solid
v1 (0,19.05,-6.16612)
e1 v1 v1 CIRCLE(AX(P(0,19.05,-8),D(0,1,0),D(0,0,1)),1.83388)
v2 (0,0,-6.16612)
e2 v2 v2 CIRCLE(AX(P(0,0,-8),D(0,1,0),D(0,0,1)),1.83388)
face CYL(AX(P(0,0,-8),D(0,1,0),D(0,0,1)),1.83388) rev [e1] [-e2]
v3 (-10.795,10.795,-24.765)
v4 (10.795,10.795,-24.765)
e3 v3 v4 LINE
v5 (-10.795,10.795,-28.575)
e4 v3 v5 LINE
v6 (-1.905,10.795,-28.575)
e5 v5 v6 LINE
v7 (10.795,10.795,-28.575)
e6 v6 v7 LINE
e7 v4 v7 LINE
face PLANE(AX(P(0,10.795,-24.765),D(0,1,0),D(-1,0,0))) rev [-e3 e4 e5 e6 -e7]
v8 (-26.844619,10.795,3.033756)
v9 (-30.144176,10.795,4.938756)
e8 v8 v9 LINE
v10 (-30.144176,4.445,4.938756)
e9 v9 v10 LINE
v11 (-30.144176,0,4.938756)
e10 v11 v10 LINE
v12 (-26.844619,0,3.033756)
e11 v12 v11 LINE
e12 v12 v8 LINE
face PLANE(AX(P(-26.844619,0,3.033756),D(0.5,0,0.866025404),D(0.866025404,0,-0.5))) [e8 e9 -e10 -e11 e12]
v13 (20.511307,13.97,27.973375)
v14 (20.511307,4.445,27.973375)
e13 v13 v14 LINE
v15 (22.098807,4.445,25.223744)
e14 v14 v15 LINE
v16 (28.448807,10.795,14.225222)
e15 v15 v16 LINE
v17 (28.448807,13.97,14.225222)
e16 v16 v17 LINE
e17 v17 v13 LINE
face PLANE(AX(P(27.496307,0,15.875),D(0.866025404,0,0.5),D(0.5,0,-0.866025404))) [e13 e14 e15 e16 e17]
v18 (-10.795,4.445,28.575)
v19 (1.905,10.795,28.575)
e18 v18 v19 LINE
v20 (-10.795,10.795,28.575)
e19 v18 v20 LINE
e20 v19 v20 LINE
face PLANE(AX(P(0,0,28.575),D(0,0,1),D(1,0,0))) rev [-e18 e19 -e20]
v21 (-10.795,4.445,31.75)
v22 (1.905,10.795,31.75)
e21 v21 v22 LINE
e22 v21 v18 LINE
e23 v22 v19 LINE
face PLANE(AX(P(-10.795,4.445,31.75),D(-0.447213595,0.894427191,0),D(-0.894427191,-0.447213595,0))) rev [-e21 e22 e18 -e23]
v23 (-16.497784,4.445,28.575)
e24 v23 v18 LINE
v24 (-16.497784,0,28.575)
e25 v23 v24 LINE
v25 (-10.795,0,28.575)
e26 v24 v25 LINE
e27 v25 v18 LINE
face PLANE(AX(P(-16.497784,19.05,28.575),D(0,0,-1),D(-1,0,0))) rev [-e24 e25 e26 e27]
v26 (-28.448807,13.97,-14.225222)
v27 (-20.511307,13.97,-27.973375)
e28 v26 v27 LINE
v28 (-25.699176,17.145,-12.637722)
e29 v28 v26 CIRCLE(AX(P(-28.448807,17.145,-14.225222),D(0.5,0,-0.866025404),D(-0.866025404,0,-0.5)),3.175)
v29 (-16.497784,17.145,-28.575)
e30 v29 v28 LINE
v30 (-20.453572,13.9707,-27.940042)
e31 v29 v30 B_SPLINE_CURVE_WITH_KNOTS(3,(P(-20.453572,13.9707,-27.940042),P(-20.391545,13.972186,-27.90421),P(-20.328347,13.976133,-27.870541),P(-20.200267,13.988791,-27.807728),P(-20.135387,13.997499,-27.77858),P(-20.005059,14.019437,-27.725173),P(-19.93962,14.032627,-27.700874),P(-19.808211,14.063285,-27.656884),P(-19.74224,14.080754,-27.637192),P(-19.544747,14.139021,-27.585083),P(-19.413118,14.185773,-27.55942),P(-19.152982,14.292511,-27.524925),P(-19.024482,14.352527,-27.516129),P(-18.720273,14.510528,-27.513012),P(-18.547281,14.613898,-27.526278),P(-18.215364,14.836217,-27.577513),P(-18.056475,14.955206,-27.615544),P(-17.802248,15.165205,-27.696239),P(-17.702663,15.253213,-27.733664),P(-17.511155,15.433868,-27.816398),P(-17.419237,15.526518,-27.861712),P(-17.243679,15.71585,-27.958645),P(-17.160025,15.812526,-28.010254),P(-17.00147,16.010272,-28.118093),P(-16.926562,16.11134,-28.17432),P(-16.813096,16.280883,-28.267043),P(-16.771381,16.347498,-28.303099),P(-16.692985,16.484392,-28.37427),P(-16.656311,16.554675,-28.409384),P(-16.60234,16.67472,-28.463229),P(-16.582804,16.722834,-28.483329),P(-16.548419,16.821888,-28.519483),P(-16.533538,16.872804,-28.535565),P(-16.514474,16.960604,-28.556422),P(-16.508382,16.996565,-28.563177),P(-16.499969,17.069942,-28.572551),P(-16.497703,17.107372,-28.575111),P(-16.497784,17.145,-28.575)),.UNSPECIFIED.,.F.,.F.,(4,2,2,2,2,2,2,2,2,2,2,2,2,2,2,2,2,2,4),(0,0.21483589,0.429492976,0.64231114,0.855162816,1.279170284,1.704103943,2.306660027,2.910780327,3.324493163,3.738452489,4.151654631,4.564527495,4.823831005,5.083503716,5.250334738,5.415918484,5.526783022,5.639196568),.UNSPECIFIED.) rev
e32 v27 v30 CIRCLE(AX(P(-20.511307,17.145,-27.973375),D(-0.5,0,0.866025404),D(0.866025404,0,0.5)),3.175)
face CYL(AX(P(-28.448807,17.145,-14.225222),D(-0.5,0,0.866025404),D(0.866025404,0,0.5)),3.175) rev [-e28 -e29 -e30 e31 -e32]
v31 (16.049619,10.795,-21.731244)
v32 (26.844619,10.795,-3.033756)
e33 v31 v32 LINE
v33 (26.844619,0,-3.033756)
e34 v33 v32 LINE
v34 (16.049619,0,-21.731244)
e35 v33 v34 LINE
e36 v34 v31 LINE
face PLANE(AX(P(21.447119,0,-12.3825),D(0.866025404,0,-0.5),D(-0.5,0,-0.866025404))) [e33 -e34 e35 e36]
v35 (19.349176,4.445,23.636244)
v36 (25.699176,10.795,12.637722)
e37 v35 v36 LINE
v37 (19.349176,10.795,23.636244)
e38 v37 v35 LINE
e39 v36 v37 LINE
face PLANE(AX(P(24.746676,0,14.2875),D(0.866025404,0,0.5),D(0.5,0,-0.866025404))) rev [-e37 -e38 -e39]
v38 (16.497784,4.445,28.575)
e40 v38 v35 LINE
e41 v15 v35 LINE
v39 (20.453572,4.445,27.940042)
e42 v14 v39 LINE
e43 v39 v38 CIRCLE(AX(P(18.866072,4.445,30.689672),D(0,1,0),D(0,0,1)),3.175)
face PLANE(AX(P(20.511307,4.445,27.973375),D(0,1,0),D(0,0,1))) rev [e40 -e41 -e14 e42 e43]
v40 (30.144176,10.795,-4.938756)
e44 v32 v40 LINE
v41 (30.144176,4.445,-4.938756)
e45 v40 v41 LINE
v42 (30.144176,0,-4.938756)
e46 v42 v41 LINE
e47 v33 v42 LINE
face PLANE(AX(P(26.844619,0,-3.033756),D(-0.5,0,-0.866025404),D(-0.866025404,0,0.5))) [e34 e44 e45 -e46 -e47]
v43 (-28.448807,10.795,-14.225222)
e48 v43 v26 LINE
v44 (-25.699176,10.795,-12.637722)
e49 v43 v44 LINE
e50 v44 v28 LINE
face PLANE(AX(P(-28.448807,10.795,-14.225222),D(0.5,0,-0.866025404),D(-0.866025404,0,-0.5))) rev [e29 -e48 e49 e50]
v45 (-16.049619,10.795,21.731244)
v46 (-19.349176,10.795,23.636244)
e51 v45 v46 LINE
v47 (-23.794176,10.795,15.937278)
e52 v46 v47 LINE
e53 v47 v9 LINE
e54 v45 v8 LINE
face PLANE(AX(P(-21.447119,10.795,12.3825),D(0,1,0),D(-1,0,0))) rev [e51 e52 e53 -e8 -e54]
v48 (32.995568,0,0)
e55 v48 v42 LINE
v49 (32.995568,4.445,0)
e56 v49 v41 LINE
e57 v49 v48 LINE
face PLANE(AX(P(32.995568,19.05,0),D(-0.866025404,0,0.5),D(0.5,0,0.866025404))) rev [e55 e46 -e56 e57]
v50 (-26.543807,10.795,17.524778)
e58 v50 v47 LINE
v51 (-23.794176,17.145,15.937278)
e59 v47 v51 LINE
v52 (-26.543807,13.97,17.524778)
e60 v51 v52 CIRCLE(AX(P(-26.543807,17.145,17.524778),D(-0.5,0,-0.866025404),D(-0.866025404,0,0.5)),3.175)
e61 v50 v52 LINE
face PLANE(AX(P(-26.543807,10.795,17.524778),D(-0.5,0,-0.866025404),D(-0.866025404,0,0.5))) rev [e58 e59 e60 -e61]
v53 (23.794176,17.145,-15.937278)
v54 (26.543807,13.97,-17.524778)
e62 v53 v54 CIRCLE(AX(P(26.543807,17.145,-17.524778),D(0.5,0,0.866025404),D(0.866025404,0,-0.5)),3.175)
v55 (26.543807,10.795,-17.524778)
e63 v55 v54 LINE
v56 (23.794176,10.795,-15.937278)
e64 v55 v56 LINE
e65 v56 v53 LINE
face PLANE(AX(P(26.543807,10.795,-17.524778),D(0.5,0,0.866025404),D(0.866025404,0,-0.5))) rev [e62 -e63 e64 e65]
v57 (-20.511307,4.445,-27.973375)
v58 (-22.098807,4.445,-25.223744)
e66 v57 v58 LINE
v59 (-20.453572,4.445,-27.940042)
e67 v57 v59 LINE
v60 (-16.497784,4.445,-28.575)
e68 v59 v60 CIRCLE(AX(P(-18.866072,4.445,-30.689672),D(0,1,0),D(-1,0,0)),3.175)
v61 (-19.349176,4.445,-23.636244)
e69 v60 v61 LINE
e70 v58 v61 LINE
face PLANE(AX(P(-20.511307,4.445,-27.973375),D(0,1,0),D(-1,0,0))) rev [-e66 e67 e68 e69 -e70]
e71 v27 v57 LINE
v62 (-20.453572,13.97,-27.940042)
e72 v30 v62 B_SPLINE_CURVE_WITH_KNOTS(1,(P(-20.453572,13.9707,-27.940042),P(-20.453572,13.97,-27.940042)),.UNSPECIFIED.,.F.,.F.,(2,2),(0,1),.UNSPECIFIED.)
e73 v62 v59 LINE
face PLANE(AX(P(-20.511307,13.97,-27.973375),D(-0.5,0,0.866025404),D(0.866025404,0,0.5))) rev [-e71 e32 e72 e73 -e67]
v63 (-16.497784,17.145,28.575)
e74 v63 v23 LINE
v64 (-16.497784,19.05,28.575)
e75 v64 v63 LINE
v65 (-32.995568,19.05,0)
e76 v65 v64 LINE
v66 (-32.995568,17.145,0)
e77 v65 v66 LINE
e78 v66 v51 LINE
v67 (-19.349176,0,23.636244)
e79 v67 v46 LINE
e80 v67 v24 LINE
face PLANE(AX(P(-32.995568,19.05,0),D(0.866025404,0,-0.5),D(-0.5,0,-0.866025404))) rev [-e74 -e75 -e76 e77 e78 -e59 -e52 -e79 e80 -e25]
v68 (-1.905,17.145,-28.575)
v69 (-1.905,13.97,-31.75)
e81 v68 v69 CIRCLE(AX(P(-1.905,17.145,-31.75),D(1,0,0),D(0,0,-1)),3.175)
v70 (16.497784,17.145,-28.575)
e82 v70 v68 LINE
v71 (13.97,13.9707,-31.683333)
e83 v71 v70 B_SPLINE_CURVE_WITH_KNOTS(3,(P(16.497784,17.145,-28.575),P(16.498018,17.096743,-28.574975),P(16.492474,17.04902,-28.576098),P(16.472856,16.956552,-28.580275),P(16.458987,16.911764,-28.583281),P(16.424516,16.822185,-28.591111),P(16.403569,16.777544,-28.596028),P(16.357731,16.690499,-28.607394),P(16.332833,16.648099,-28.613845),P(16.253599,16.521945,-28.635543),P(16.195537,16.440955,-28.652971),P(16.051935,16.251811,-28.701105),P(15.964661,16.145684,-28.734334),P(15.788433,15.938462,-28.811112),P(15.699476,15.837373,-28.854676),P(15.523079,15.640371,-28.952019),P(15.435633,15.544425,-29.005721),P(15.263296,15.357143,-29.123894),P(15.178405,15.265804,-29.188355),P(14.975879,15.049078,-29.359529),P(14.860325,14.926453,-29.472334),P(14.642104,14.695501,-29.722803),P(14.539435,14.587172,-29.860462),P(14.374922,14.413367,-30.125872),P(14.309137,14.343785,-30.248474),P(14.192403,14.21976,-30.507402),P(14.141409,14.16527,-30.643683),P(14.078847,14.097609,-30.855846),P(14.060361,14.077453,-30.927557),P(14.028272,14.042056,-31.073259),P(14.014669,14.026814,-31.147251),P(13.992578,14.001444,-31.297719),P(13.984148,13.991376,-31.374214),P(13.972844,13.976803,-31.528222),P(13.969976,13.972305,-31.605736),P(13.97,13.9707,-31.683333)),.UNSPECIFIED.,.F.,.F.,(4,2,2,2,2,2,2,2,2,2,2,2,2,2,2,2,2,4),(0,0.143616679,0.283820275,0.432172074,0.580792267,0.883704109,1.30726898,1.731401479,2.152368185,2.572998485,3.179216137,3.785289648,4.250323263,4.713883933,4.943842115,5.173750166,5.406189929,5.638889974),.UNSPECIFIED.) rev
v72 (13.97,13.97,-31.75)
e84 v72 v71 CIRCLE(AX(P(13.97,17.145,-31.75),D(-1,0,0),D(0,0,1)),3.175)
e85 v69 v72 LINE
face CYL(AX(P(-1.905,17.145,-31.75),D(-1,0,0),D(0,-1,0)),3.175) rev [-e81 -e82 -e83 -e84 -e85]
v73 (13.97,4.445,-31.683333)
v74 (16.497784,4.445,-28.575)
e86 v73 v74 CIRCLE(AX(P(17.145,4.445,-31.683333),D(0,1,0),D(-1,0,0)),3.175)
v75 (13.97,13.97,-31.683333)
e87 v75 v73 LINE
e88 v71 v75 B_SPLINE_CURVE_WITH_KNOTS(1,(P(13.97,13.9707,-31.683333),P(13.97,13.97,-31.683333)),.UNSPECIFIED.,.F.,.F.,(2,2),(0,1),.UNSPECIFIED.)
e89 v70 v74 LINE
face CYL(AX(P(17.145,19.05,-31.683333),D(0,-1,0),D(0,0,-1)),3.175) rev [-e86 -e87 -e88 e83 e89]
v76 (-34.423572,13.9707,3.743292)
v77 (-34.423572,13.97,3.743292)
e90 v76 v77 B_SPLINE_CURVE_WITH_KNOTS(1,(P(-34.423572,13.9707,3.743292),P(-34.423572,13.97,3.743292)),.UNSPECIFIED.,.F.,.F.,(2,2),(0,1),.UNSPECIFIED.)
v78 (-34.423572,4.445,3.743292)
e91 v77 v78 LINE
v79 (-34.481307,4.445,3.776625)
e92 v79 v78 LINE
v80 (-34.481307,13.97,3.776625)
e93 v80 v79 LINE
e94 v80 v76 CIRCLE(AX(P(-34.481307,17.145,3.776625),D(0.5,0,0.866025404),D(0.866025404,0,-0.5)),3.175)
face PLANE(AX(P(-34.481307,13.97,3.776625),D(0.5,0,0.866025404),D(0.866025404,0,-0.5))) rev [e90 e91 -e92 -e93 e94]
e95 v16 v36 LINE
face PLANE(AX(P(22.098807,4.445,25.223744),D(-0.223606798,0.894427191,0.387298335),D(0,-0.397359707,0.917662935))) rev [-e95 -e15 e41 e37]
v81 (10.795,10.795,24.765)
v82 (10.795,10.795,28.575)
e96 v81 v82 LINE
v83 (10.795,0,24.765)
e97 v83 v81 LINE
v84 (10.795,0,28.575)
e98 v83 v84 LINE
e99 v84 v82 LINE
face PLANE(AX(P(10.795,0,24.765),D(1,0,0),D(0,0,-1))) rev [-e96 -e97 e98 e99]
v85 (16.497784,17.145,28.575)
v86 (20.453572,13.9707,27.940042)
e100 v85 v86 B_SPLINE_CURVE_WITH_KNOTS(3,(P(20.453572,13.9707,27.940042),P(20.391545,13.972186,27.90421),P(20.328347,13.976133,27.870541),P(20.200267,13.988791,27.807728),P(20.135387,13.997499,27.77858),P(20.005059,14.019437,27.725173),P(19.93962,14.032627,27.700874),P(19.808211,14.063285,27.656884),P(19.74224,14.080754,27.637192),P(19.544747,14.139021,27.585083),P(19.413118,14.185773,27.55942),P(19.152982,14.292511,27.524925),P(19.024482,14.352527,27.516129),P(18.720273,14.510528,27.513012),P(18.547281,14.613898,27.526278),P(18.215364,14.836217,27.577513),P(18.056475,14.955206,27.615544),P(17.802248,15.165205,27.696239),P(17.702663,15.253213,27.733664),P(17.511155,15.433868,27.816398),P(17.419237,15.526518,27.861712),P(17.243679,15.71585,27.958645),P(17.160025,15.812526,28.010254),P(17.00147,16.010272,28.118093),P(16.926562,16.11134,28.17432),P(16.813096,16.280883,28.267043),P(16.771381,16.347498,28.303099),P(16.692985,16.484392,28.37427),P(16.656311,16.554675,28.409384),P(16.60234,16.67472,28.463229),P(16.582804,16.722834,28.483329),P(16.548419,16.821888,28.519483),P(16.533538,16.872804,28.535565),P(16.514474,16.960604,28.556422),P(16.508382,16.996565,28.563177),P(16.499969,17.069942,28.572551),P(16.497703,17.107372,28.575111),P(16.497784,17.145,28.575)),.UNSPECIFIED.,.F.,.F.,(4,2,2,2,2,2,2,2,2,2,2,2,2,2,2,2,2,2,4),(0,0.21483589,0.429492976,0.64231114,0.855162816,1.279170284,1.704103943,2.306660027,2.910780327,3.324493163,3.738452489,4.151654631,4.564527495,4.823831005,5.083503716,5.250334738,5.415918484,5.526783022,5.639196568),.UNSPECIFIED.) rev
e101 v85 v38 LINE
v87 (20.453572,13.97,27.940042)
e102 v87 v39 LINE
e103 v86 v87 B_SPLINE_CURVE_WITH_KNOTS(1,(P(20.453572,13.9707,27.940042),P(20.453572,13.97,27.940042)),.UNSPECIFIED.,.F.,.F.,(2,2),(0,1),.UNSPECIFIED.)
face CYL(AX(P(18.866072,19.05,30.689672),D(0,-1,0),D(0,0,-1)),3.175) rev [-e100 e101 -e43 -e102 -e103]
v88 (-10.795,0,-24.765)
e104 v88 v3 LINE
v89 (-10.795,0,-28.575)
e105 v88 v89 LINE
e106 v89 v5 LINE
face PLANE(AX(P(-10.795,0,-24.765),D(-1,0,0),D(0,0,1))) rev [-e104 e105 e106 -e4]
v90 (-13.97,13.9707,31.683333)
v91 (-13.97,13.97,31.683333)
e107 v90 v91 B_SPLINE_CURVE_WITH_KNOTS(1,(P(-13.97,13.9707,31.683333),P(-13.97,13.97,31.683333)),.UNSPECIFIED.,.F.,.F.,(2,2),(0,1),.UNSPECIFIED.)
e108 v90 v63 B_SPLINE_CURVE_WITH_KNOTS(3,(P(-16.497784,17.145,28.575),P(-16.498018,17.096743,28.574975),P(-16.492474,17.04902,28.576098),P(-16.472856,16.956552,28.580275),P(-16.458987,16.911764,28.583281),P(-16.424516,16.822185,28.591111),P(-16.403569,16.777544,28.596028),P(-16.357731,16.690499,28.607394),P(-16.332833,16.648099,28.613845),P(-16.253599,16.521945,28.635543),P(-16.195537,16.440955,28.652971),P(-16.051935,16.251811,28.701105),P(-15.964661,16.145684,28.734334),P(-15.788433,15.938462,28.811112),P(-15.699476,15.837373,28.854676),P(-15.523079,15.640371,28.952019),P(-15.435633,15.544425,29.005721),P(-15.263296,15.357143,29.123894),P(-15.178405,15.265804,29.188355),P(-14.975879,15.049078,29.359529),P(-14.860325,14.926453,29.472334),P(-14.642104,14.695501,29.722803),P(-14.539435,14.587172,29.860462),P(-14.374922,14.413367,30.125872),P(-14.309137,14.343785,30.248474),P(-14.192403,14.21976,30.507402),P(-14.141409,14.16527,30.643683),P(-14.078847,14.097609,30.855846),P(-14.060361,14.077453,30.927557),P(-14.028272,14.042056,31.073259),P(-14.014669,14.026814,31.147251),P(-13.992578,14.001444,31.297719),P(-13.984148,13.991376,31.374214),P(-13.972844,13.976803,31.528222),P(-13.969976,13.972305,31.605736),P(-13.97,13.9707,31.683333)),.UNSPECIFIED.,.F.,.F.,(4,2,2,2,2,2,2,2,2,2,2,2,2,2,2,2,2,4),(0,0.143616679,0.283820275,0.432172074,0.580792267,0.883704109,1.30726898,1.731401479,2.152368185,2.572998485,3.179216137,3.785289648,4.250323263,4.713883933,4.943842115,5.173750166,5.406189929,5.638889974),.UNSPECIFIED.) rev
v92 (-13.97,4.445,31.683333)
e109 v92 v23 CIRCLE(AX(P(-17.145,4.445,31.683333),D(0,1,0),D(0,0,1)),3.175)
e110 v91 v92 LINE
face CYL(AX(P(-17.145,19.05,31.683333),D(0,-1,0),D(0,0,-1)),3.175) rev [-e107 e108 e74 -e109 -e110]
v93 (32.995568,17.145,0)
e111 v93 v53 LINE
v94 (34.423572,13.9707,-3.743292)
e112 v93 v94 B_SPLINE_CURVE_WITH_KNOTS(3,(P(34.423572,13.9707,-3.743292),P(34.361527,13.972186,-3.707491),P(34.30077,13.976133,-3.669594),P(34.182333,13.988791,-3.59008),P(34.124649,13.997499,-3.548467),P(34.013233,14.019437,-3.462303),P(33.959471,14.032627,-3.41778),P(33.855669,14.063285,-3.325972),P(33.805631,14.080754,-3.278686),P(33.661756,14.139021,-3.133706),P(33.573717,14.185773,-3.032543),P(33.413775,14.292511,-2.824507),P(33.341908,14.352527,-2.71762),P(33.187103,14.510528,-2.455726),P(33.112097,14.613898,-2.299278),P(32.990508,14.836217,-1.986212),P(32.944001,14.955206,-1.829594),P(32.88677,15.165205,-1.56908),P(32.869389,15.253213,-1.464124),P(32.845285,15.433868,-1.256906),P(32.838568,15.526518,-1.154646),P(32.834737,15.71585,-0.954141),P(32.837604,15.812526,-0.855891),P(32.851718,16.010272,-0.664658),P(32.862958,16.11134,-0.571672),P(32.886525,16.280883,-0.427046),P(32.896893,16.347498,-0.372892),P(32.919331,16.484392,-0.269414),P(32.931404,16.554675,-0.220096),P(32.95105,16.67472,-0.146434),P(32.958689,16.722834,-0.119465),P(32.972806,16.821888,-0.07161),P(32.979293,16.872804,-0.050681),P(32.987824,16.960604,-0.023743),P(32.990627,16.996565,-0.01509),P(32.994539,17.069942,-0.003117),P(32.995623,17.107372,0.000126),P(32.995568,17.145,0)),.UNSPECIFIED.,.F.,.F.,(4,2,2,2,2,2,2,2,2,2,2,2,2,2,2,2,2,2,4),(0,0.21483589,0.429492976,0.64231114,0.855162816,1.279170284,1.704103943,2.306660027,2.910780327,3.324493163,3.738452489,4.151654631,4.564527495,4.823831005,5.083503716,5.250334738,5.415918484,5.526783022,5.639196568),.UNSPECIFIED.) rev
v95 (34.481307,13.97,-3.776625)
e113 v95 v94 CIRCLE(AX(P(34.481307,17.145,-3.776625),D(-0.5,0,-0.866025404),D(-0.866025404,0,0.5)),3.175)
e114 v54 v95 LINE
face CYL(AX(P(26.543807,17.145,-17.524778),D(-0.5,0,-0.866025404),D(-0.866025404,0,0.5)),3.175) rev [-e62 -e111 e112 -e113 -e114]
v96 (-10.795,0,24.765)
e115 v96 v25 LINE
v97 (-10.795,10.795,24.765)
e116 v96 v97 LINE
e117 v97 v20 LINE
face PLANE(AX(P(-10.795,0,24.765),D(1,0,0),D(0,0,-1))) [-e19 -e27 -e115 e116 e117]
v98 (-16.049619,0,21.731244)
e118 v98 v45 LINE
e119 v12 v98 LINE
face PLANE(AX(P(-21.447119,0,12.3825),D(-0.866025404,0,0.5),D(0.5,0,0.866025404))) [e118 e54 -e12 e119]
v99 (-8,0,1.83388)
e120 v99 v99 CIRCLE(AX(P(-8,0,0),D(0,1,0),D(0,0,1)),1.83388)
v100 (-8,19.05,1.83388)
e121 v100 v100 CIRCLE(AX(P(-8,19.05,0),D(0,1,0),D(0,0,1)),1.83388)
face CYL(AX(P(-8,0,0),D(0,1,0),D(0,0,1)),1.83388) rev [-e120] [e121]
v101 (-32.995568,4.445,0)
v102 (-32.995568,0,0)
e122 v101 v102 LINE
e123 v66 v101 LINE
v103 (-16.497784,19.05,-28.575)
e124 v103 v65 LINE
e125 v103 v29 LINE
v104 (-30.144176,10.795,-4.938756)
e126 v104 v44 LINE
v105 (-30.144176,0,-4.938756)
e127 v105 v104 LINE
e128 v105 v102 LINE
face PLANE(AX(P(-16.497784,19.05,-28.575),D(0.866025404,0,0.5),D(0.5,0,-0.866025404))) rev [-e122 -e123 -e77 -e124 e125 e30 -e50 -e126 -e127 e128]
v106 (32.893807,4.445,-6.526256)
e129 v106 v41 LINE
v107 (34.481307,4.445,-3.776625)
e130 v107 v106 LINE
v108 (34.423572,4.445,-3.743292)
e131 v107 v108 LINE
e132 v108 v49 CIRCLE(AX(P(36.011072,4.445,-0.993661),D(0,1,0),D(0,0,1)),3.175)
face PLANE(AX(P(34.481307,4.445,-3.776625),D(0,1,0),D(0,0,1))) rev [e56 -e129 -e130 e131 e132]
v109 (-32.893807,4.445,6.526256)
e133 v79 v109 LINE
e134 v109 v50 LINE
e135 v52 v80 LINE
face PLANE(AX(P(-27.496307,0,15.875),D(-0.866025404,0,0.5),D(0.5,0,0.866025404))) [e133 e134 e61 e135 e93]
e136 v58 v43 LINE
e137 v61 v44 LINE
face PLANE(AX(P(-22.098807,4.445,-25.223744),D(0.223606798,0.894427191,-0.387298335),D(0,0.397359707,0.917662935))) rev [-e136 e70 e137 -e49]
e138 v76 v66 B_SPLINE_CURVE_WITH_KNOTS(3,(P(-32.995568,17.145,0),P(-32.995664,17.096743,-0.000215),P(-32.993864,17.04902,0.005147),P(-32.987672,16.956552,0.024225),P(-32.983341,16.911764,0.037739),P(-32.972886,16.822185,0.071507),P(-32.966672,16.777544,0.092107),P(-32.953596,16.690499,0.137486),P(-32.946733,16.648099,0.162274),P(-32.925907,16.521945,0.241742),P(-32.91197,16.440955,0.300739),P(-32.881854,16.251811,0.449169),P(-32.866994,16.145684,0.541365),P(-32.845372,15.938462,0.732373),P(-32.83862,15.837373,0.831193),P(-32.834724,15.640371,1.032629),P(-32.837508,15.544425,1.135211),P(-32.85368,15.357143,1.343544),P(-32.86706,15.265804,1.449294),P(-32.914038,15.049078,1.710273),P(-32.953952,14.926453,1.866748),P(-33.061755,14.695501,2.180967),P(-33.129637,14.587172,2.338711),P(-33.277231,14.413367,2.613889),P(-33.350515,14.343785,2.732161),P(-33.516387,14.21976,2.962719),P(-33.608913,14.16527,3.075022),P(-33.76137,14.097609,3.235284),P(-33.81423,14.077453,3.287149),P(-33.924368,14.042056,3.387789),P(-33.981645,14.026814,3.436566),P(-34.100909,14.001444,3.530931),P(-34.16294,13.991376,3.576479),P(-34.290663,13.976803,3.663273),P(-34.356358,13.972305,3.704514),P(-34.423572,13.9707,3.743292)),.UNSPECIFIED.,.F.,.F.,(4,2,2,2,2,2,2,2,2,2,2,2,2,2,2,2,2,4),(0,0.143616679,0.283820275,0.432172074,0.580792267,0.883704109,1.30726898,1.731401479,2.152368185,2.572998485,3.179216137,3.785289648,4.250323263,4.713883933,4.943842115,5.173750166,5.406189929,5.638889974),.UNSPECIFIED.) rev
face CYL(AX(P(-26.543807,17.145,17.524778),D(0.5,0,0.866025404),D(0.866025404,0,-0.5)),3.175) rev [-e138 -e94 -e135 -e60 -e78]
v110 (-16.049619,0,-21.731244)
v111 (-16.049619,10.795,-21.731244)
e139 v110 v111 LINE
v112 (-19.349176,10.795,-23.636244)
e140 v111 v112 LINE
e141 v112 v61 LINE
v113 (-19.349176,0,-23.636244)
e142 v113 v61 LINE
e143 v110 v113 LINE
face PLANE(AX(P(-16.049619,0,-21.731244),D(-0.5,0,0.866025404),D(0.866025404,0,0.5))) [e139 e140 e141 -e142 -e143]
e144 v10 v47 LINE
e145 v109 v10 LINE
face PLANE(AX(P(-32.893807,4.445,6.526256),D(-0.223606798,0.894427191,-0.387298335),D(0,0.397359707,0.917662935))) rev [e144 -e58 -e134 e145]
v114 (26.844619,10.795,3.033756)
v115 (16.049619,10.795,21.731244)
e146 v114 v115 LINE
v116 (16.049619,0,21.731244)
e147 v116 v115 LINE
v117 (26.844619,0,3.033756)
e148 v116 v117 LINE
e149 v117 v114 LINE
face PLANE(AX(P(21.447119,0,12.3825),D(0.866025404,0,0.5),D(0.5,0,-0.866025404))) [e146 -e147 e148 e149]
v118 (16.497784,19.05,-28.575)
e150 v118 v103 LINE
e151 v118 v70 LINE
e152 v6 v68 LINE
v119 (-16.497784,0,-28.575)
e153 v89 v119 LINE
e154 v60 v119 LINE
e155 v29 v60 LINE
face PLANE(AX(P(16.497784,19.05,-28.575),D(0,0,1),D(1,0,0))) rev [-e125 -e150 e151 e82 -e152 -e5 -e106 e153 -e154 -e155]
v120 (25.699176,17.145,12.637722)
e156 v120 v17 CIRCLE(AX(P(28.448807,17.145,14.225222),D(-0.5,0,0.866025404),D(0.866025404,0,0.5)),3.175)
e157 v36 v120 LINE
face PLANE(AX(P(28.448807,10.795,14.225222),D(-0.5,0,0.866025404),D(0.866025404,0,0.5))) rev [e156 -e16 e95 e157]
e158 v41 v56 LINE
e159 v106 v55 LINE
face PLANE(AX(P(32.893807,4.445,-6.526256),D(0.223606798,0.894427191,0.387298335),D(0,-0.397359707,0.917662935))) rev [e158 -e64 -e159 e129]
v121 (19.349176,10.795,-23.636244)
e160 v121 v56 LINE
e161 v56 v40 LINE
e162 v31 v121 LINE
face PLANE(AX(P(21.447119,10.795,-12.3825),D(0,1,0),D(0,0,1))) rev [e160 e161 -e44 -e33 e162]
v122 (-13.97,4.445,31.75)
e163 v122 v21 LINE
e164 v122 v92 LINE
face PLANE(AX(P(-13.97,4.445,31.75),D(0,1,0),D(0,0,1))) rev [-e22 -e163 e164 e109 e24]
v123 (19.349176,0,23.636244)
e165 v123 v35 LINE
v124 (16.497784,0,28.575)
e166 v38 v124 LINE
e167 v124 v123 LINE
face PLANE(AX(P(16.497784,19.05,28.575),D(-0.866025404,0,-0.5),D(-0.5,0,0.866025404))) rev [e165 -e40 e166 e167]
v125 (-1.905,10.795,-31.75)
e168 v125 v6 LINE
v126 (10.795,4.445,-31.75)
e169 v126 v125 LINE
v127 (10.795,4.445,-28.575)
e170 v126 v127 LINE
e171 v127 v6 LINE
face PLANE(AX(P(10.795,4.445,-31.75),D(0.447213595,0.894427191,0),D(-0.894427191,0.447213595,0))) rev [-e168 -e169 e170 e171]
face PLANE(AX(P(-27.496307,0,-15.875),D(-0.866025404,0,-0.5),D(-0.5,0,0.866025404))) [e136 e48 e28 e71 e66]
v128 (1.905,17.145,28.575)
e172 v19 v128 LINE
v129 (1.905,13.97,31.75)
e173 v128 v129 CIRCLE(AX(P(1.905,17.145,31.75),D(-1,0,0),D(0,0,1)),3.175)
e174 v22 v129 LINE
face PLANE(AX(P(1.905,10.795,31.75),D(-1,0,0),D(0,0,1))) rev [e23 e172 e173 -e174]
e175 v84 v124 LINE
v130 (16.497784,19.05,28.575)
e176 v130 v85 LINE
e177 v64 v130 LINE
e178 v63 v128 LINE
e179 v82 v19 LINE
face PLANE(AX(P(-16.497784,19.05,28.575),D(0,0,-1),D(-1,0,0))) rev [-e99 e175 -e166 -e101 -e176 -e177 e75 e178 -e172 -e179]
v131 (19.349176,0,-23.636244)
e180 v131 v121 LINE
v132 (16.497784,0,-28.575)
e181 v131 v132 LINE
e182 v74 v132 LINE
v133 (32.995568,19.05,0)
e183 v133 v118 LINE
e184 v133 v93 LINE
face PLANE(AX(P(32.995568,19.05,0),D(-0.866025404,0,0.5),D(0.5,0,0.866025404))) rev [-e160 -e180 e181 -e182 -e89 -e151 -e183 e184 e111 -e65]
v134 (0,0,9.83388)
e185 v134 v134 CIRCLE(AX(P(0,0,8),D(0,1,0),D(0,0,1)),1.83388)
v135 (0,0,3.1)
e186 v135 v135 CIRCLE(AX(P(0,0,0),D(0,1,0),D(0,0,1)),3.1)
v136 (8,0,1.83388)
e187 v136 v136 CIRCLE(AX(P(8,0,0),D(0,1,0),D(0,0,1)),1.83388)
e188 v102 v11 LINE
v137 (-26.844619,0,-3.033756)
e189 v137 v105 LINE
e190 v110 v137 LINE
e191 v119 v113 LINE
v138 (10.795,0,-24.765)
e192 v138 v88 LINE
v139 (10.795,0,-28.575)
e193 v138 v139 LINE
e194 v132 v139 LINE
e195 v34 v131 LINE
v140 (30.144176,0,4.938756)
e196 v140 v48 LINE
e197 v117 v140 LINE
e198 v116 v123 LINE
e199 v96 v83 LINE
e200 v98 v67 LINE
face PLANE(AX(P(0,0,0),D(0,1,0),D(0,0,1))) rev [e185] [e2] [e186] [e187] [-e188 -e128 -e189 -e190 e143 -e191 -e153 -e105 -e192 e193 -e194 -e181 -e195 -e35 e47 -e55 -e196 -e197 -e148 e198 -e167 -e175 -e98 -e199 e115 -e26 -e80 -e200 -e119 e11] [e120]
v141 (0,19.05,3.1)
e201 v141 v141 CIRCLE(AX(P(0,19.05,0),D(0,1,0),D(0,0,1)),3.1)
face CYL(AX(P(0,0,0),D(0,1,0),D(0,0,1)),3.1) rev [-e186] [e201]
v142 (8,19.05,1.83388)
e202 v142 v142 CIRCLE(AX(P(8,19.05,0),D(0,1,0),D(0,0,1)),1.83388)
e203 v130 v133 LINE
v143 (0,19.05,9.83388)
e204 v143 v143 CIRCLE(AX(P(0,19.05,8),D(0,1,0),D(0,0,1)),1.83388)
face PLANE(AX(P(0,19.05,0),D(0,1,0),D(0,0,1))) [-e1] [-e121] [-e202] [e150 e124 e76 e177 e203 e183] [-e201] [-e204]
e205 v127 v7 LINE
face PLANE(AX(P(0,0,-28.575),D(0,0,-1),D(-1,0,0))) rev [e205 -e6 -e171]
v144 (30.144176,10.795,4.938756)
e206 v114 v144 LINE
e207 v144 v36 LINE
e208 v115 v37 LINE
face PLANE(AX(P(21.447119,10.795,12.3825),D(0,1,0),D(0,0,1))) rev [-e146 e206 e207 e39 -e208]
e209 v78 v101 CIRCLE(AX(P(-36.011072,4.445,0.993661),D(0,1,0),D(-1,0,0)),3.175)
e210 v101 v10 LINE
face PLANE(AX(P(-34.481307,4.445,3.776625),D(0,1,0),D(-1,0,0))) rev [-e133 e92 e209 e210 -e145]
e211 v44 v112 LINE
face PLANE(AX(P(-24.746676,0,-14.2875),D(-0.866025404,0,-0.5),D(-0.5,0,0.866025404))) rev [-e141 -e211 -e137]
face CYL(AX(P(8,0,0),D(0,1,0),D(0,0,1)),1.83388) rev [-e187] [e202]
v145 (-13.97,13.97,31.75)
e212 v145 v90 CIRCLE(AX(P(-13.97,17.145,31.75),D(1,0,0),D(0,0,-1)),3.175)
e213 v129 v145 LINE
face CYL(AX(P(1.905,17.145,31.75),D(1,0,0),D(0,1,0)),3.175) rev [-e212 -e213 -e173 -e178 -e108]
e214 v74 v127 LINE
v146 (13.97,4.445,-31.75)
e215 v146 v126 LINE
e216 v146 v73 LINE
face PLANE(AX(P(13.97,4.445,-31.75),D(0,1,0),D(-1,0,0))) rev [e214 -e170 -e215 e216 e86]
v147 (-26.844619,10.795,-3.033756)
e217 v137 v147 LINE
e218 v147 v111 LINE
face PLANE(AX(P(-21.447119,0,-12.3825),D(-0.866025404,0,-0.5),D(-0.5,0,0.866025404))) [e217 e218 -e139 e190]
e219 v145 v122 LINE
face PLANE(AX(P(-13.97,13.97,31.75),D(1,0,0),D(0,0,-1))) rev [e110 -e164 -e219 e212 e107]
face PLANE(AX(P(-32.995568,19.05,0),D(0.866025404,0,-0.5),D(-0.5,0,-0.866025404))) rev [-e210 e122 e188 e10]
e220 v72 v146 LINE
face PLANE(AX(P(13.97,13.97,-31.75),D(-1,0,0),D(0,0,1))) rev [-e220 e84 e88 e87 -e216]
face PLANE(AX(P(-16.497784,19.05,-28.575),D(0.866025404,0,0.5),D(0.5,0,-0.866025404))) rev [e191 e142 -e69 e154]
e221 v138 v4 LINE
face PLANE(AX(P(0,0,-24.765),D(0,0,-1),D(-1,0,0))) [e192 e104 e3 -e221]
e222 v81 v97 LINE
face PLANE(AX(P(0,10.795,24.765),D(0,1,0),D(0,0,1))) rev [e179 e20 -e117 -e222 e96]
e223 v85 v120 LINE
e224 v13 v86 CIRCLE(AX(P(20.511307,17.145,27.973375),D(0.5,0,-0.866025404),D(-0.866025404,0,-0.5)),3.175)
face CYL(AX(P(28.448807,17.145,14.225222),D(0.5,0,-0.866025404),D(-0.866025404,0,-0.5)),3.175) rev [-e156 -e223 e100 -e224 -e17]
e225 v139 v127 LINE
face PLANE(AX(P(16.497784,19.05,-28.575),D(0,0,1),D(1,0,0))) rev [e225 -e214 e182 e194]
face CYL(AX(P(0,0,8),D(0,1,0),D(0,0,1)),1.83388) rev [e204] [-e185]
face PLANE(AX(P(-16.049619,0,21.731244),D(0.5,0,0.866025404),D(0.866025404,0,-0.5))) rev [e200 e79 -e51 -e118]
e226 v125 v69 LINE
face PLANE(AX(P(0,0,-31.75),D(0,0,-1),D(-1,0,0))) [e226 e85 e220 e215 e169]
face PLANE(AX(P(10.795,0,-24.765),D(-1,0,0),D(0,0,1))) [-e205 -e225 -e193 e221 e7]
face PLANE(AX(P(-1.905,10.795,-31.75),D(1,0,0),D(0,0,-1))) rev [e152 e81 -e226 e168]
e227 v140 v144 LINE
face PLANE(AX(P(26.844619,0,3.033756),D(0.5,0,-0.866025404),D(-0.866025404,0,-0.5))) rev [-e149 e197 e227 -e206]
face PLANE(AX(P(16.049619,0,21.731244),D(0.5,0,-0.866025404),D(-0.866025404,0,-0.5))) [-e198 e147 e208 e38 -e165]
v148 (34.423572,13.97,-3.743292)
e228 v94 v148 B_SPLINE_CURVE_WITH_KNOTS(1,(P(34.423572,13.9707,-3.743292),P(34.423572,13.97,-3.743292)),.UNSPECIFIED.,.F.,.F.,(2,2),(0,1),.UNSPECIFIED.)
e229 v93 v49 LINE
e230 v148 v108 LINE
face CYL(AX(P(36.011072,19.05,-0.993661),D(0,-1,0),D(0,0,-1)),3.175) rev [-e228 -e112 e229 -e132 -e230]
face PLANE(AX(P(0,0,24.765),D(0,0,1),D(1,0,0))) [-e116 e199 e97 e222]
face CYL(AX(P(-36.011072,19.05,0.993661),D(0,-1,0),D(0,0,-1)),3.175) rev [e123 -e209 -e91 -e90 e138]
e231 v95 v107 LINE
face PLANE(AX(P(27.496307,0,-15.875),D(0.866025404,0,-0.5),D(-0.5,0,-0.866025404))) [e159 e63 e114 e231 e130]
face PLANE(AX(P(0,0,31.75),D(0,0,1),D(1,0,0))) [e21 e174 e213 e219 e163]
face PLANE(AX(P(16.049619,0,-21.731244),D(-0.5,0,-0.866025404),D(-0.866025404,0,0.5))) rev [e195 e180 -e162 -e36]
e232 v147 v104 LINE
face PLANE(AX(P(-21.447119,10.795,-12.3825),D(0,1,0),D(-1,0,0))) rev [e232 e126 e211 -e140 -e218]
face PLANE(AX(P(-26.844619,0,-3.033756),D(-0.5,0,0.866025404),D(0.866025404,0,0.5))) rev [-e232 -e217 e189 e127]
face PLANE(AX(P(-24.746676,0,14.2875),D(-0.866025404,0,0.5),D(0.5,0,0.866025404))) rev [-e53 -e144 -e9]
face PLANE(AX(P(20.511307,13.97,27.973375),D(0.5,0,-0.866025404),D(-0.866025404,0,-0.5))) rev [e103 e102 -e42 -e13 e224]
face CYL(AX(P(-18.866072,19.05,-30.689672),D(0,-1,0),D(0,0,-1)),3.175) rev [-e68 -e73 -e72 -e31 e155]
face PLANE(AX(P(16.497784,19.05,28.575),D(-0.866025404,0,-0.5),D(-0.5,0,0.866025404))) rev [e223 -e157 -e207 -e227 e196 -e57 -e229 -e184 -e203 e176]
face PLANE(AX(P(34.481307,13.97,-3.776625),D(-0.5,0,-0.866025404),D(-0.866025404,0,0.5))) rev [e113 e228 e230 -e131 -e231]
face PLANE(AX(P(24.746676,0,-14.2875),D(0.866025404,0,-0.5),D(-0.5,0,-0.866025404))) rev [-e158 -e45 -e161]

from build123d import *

# Parameters (mm, degrees)
BOSS_EXTRUDE1_DEPTH = 19.05
SKETCH2_W           = 10.795
SKETCH2_H           = 10.795
CUT_EXTRUDE1_DEPTH  = 3.81
BOSS_EXTRUDE2_DEPTH = 3.175
CIRPATTERN1_COUNT   = 6
SKETCH6_R           = 3.1
SKETCH6_R_2         = 1.83388
CUT_EXTRUDE3_DEPTH  = 51.595706367
FILLET1_R           = 3.175


with BuildPart() as part:
    # Sketch1 → Boss-Extrude1 (new body)
    with BuildSketch(Plane(origin=(0, 0, 0), x_dir=(1, 0, 0), z_dir=(0, 1, 0))):
        Polygon((16.497783942, 28.575), (-16.497783942, 28.575), (-32.995567884, 0), (-16.497783942, -28.575), (16.497783942, -28.575), (32.995567884, 0), align=None)
    extrude(amount=BOSS_EXTRUDE1_DEPTH)

    # Sketch2 → Cut-Extrude1 (cut)
    with BuildSketch(Plane(origin=(24.746675913, 0, 14.2875), x_dir=(0.4999999999999996, 0, -0.8660254037844389), z_dir=(0.8660254037844388, 0, 0.49999999999999956))):
        with Locations((-5.3975, 5.3975)):
            Rectangle(SKETCH2_W, SKETCH2_H)
        with Locations((5.3975, 5.3975)):
            Rectangle(SKETCH2_W, SKETCH2_H)
    cut_extrude1 = extrude(amount=-CUT_EXTRUDE1_DEPTH, mode=Mode.SUBTRACT)

    # Sketch3 → Boss-Extrude2 (add)
    with BuildSketch(Plane(origin=(24.746675913, 0, 14.2875), x_dir=(0.4999999999999996, 0, -0.8660254037844389), z_dir=(0.8660254037844388, 0, 0.49999999999999956))):
        Polygon((-13.97, 13.97), (-13.97, 4.445), (-10.795, 4.445), (1.905, 10.795), (1.905, 13.97), align=None)
    boss_extrude2 = extrude(amount=BOSS_EXTRUDE2_DEPTH)

    # CirPattern1: Cut-Extrude1, Boss-Extrude2 ×6 about axis
    cirpattern1_axis = Axis((0, 0, 0), (0, 1, 0))
    add([cut_extrude1.rotate(cirpattern1_axis, i * 360 / CIRPATTERN1_COUNT) for i in range(1, CIRPATTERN1_COUNT)], mode=Mode.SUBTRACT)
    add([boss_extrude2.rotate(cirpattern1_axis, i * 360 / CIRPATTERN1_COUNT) for i in range(1, CIRPATTERN1_COUNT)])

    # Sketch6 → Cut-Extrude3 (cut, through all)
    with BuildSketch(Plane(origin=(0, 19.05, 0), x_dir=(1, 0, 0), z_dir=(0, 1, 0))):
        with Locations(Location((0, 0, 0), (0, 0, 270))):
            Circle(SKETCH6_R)
        with Locations(Location((0, 8, 0), (0, 0, 270))):
            Circle(SKETCH6_R_2)
        with Locations(Location((8, 0, 0), (0, 0, 270))):
            Circle(SKETCH6_R_2)
        with Locations(Location((0, -8, 0), (0, 0, 270))):
            Circle(SKETCH6_R_2)
        with Locations(Location((-8, 0, 0), (0, 0, 270))):
            Circle(SKETCH6_R_2)
    extrude(amount=-CUT_EXTRUDE3_DEPTH, mode=Mode.SUBTRACT)

    # Fillet1
    # the kernel refuses this fillet: 3.175 mm, written as the material it adds along each edge
    with BuildSketch(Plane(origin=(-13.97, 13.97, 28.575), x_dir=(-1.0, -6.713789629229293e-15, 2.071656471641608e-12), z_dir=(0, -1, 0)), Plane(origin=(-31.731675913, 13.97, 2.189125109), x_dir=(-0.5000000000017967, -6.713789629229294e-15, -0.8660254037834013), z_dir=(0, -1, 0)), Plane(origin=(-17.761675913, 13.97, -26.385874891), x_dir=(0.4999999999982169, -6.713789629229294e-15, -0.866025403785468), z_dir=(0, -1, 0)), Plane(origin=(13.97, 13.97, -28.575), x_dir=(1.0, -6.713789629229294e-15, -2.032303431474765e-12), z_dir=(0, -1, 0)), Plane(origin=(31.731675913, 13.97, -2.189125109), x_dir=(0.5000000000017165, -6.7137896292292946e-15, 0.8660254037834476), z_dir=(0, -1, 0)), Plane(origin=(17.761675913, 13.97, 26.385874891), x_dir=(-0.49999999999821076, -6.713789629229294e-15, 0.8660254037854717), z_dir=(0, -1, 0))) as fillet1_piece_1:
        with BuildLine():
            CenterArc((3.175, -3.108333376), FILLET1_R, 101.762045639, 78.237954362)
            Line((0, -3.108333376), (-0.0635, -3.108333376))
            Line((-0.0635, -3.108333376), (-0.0635, 0))
            Line((-0.0635, 0), (0, 0.0635))
            ThreePointArc((0, 0.0635), (1.263891971, 0.0635), (2.514839621, 0.062166668))
            Line((2.514839621, 0.062166668), (2.527783942, 0))
        make_face()
    extrude(amount=9.525)
    with BuildSketch(Plane(origin=(1.905, 13.97, 28.575), x_dir=(0, 1, 0), z_dir=(-1, 0, 0)), Plane(origin=(-23.794175913, 13.97, 15.937278394), x_dir=(0, 1, 0), z_dir=(-0.5, 0, -0.8660254037844387)), Plane(origin=(-25.699175913, 13.97, -12.637721606), x_dir=(0, 1, 0), z_dir=(0.4999999999999997, 0, -0.8660254037844388)), Plane(origin=(-1.905, 13.97, -28.575), x_dir=(0, 1, 0), z_dir=(1, 0, 0)), Plane(origin=(23.794175913, 13.97, -15.937278394), x_dir=(0, 1, 0), z_dir=(0.5000000000000003, 0, 0.8660254037844386)), Plane(origin=(25.699175913, 13.97, 12.637721606), x_dir=(0, 1, 0), z_dir=(-0.4999999999999996, 0, 0.8660254037844389))) as fillet1_piece_2:
        with BuildLine():
            CenterArc((FILLET1_R, -FILLET1_R), FILLET1_R, 90, 90)
            Line((0, -FILLET1_R), (-FILLET1_R * 0.02, -FILLET1_R))
            Line((-FILLET1_R * 0.02, -FILLET1_R), (-FILLET1_R * 0.02, FILLET1_R * 0.02))
            Line((-FILLET1_R * 0.02, FILLET1_R * 0.02), (FILLET1_R, FILLET1_R * 0.02))
            Line((FILLET1_R, FILLET1_R * 0.02), (FILLET1_R, 0))
        make_face()
    extrude(amount=15.875)
    with BuildSketch(Plane(origin=(-13.97, 21.740833439, 28.575), x_dir=(-1.0, -6.713789629229294e-15, 2.08290019740361e-12), z_dir=(0, -1, 0))) as fillet1_piece_3a_section:
        with BuildLine():
            CenterArc((3.175, -3.108333376), FILLET1_R, 101.762045639, 78.237954362)
            Line((0, -3.108333376), (-0.0635, -3.108333376))
            Line((-0.0635, -3.108333376), (-0.0635, 0))
            Line((-0.0635, 0), (0, 0.0635))
            ThreePointArc((0, 0.0635), (1.263891971, 0.0635), (2.514839621, 0.062166668))
            Line((2.514839621, 0.062166668), (2.527783942, 0))
        make_face()
    fillet1_piece_3a = extrude(amount=17.295833439, mode=Mode.PRIVATE)
    fillet1_piece_3a = split(fillet1_piece_3a, bisect_by=Plane(origin=(-14.601274605, 19.05, 29.300800837), z_dir=(0, -1, 0)), keep=Keep.TOP, mode=Mode.PRIVATE)
    fillet1_piece_3a = split(fillet1_piece_3a, bisect_by=Plane(origin=(-14.601274605, 13.97, 29.300800837), z_dir=(0, 1, 0)), keep=Keep.TOP, mode=Mode.PRIVATE)
    with BuildSketch(Plane(origin=(1.905, 13.97, 28.575), x_dir=(0, 1, 0), z_dir=(-1, 0, 0))) as fillet1_piece_3b_section:
        with BuildLine():
            CenterArc((FILLET1_R, -FILLET1_R), FILLET1_R, 90, 90)
            Line((0, -FILLET1_R), (-FILLET1_R * 0.02, -FILLET1_R))
            Line((-FILLET1_R * 0.02, -FILLET1_R), (-FILLET1_R * 0.02, FILLET1_R * 0.02))
            Line((-FILLET1_R * 0.02, FILLET1_R * 0.02), (FILLET1_R, FILLET1_R * 0.02))
            Line((FILLET1_R, FILLET1_R * 0.02), (FILLET1_R, 0))
        make_face()
    fillet1_piece_3b = extrude(amount=23.8125, mode=Mode.PRIVATE)
    fillet1_piece_3b = split(fillet1_piece_3b, bisect_by=Plane(origin=(-15.883361885, 14.764439111, 29.63921022), z_dir=(0.8660254037844387, 0, -0.5000000000000003)), keep=Keep.TOP, mode=Mode.PRIVATE)
    fillet1_piece_3b = split(fillet1_piece_3b, bisect_by=Plane(origin=(-13.97, 14.764439111, 29.165775935), z_dir=(-1, 0, 0)), keep=Keep.TOP, mode=Mode.PRIVATE)
    fillet1_piece_3 = fillet1_piece_3a & fillet1_piece_3b
    add(fillet1_piece_3)
    with BuildSketch(Plane(origin=(-31.731675913, 21.740833439, 2.189125109), x_dir=(-0.5000000000018066, -6.7137896292292946e-15, -0.8660254037833955), z_dir=(0, -1, 0))) as fillet1_piece_4a_section:
        with BuildLine():
            CenterArc((3.175, -3.108333376), FILLET1_R, 101.762045639, 78.237954362)
            Line((0, -3.108333376), (-0.0635, -3.108333376))
            Line((-0.0635, -3.108333376), (-0.0635, 0))
            Line((-0.0635, 0), (0, 0.0635))
            ThreePointArc((0, 0.0635), (1.263891971, 0.0635), (2.514839621, 0.062166668))
            Line((2.514839621, 0.062166668), (2.527783942, 0))
        make_face()
    fillet1_piece_4a = extrude(amount=17.295833439, mode=Mode.PRIVATE)
    fillet1_piece_4a = split(fillet1_piece_4a, bisect_by=Plane(origin=(-32.675875179, 19.05, 2.005325683), z_dir=(0, -1, 0)), keep=Keep.TOP, mode=Mode.PRIVATE)
    fillet1_piece_4a = split(fillet1_piece_4a, bisect_by=Plane(origin=(-32.675875179, 13.97, 2.005325683), z_dir=(0, 1, 0)), keep=Keep.TOP, mode=Mode.PRIVATE)
    with BuildSketch(Plane(origin=(-23.794175913, 13.97, 15.937278394), x_dir=(0, 1, 0), z_dir=(-0.5, 0, -0.8660254037844387))) as fillet1_piece_4b_section:
        with BuildLine():
            CenterArc((FILLET1_R, -FILLET1_R), FILLET1_R, 90, 90)
            Line((0, -FILLET1_R), (-FILLET1_R * 0.02, -FILLET1_R))
            Line((-FILLET1_R * 0.02, -FILLET1_R), (-FILLET1_R * 0.02, FILLET1_R * 0.02))
            Line((-FILLET1_R * 0.02, FILLET1_R * 0.02), (FILLET1_R, FILLET1_R * 0.02))
            Line((FILLET1_R, FILLET1_R * 0.02), (FILLET1_R, 0))
        make_face()
    fillet1_piece_4b = extrude(amount=23.8125, mode=Mode.PRIVATE)
    fillet1_piece_4b = split(fillet1_piece_4b, bisect_by=Plane(origin=(-33.609989941, 14.764439111, 1.06421022), z_dir=(0.866025403784439, 0, 0.4999999999999995)), keep=Keep.TOP, mode=Mode.PRIVATE)
    fillet1_piece_4b = split(fillet1_piece_4b, bisect_by=Plane(origin=(-32.243302881, 14.764439111, 2.484513077), z_dir=(-0.5000000000000001, -6.713789629229295e-15, -0.8660254037844387)), keep=Keep.TOP, mode=Mode.PRIVATE)
    fillet1_piece_4 = fillet1_piece_4a & fillet1_piece_4b
    add(fillet1_piece_4)
    with BuildSketch(Plane(origin=(-17.761675913, 21.740833439, -26.385874891), x_dir=(0.4999999999982358, -6.713789629229293e-15, -0.8660254037854572), z_dir=(0, -1, 0))) as fillet1_piece_5a_section:
        with BuildLine():
            CenterArc((3.175, -3.108333376), FILLET1_R, 101.762045639, 78.237954362)
            Line((0, -3.108333376), (-0.0635, -3.108333376))
            Line((-0.0635, -3.108333376), (-0.0635, 0))
            Line((-0.0635, 0), (0, 0.0635))
            ThreePointArc((0, 0.0635), (1.263891971, 0.0635), (2.514839621, 0.062166668))
            Line((2.514839621, 0.062166668), (2.527783942, 0))
        make_face()
    fillet1_piece_5a = extrude(amount=17.295833439, mode=Mode.PRIVATE)
    fillet1_piece_5a = split(fillet1_piece_5a, bisect_by=Plane(origin=(-18.074600574, 19.05, -27.295475154), z_dir=(0, -1, 0)), keep=Keep.TOP, mode=Mode.PRIVATE)
    fillet1_piece_5a = split(fillet1_piece_5a, bisect_by=Plane(origin=(-18.074600574, 13.97, -27.295475154), z_dir=(0, 1, 0)), keep=Keep.TOP, mode=Mode.PRIVATE)
    with BuildSketch(Plane(origin=(-25.699175913, 13.97, -12.637721606), x_dir=(0, 1, 0), z_dir=(0.4999999999999997, 0, -0.8660254037844388))) as fillet1_piece_5b_section:
        with BuildLine():
            CenterArc((FILLET1_R, -FILLET1_R), FILLET1_R, 90, 90)
            Line((0, -FILLET1_R), (-FILLET1_R * 0.02, -FILLET1_R))
            Line((-FILLET1_R * 0.02, -FILLET1_R), (-FILLET1_R * 0.02, FILLET1_R * 0.02))
            Line((-FILLET1_R * 0.02, FILLET1_R * 0.02), (FILLET1_R, FILLET1_R * 0.02))
            Line((FILLET1_R, FILLET1_R * 0.02), (FILLET1_R, 0))
        make_face()
    fillet1_piece_5b = extrude(amount=23.8125, mode=Mode.PRIVATE)
    fillet1_piece_5b = split(fillet1_piece_5b, bisect_by=Plane(origin=(-17.726628056, 14.764439111, -28.575), z_dir=(0, 0, 1)), keep=Keep.TOP, mode=Mode.PRIVATE)
    fillet1_piece_5b = split(fillet1_piece_5b, bisect_by=Plane(origin=(-18.273302881, 14.764439111, -26.681262858), z_dir=(0.49999999999999967, -6.713789629229293e-15, -0.8660254037844388)), keep=Keep.TOP, mode=Mode.PRIVATE)
    fillet1_piece_5 = fillet1_piece_5a & fillet1_piece_5b
    add(fillet1_piece_5)
    with BuildSketch(Plane(origin=(13.97, 21.740833439, -28.575), x_dir=(1.0, -6.713789629229293e-15, -2.0351143629152955e-12), z_dir=(0, -1, 0))) as fillet1_piece_6a_section:
        with BuildLine():
            CenterArc((3.175, -3.108333376), FILLET1_R, 101.762045639, 78.237954362)
            Line((0, -3.108333376), (-0.0635, -3.108333376))
            Line((-0.0635, -3.108333376), (-0.0635, 0))
            Line((-0.0635, 0), (0, 0.0635))
            ThreePointArc((0, 0.0635), (1.263891971, 0.0635), (2.514839621, 0.062166668))
            Line((2.514839621, 0.062166668), (2.527783942, 0))
        make_face()
    fillet1_piece_6a = extrude(amount=17.295833439, mode=Mode.PRIVATE)
    fillet1_piece_6a = split(fillet1_piece_6a, bisect_by=Plane(origin=(14.601274605, 19.05, -29.300800837), z_dir=(0, -1, 0)), keep=Keep.TOP, mode=Mode.PRIVATE)
    fillet1_piece_6a = split(fillet1_piece_6a, bisect_by=Plane(origin=(14.601274605, 13.97, -29.300800837), z_dir=(0, 1, 0)), keep=Keep.TOP, mode=Mode.PRIVATE)
    with BuildSketch(Plane(origin=(-1.905, 13.97, -28.575), x_dir=(0, 1, 0), z_dir=(1, 0, 0))) as fillet1_piece_6b_section:
        with BuildLine():
            CenterArc((FILLET1_R, -FILLET1_R), FILLET1_R, 90, 90)
            Line((0, -FILLET1_R), (-FILLET1_R * 0.02, -FILLET1_R))
            Line((-FILLET1_R * 0.02, -FILLET1_R), (-FILLET1_R * 0.02, FILLET1_R * 0.02))
            Line((-FILLET1_R * 0.02, FILLET1_R * 0.02), (FILLET1_R, FILLET1_R * 0.02))
            Line((FILLET1_R, FILLET1_R * 0.02), (FILLET1_R, 0))
        make_face()
    fillet1_piece_6b = extrude(amount=23.8125, mode=Mode.PRIVATE)
    fillet1_piece_6b = split(fillet1_piece_6b, bisect_by=Plane(origin=(15.883361885, 14.764439111, -29.63921022), z_dir=(-0.8660254037844387, 0, 0.5000000000000003)), keep=Keep.TOP, mode=Mode.PRIVATE)
    fillet1_piece_6b = split(fillet1_piece_6b, bisect_by=Plane(origin=(13.97, 14.764439111, -29.165775935), z_dir=(1, 0, 0)), keep=Keep.TOP, mode=Mode.PRIVATE)
    fillet1_piece_6 = fillet1_piece_6a & fillet1_piece_6b
    add(fillet1_piece_6)
    with BuildSketch(Plane(origin=(31.731675913, 21.740833439, -2.189125109), x_dir=(0.5000000000017293, -6.713789629229294e-15, 0.8660254037834403), z_dir=(0, -1, 0))) as fillet1_piece_7a_section:
        with BuildLine():
            CenterArc((3.175, -3.108333376), FILLET1_R, 101.762045639, 78.237954362)
            Line((0, -3.108333376), (-0.0635, -3.108333376))
            Line((-0.0635, -3.108333376), (-0.0635, 0))
            Line((-0.0635, 0), (0, 0.0635))
            ThreePointArc((0, 0.0635), (1.263891971, 0.0635), (2.514839621, 0.062166668))
            Line((2.514839621, 0.062166668), (2.527783942, 0))
        make_face()
    fillet1_piece_7a = extrude(amount=17.295833439, mode=Mode.PRIVATE)
    fillet1_piece_7a = split(fillet1_piece_7a, bisect_by=Plane(origin=(32.675875179, 19.05, -2.005325683), z_dir=(0, -1, 0)), keep=Keep.TOP, mode=Mode.PRIVATE)
    fillet1_piece_7a = split(fillet1_piece_7a, bisect_by=Plane(origin=(32.675875179, 13.97, -2.005325683), z_dir=(0, 1, 0)), keep=Keep.TOP, mode=Mode.PRIVATE)
    with BuildSketch(Plane(origin=(23.794175913, 13.97, -15.937278394), x_dir=(0, 1, 0), z_dir=(0.5000000000000003, 0, 0.8660254037844386))) as fillet1_piece_7b_section:
        with BuildLine():
            CenterArc((FILLET1_R, -FILLET1_R), FILLET1_R, 90, 90)
            Line((0, -FILLET1_R), (-FILLET1_R * 0.02, -FILLET1_R))
            Line((-FILLET1_R * 0.02, -FILLET1_R), (-FILLET1_R * 0.02, FILLET1_R * 0.02))
            Line((-FILLET1_R * 0.02, FILLET1_R * 0.02), (FILLET1_R, FILLET1_R * 0.02))
            Line((FILLET1_R, FILLET1_R * 0.02), (FILLET1_R, 0))
        make_face()
    fillet1_piece_7b = extrude(amount=23.8125, mode=Mode.PRIVATE)
    fillet1_piece_7b = split(fillet1_piece_7b, bisect_by=Plane(origin=(33.609989941, 14.764439111, -1.06421022), z_dir=(-0.8660254037844389, 0, -0.4999999999999995)), keep=Keep.TOP, mode=Mode.PRIVATE)
    fillet1_piece_7b = split(fillet1_piece_7b, bisect_by=Plane(origin=(32.243302881, 14.764439111, -2.484513077), z_dir=(0.5000000000000004, -6.713789629229294e-15, 0.8660254037844385)), keep=Keep.TOP, mode=Mode.PRIVATE)
    fillet1_piece_7 = fillet1_piece_7a & fillet1_piece_7b
    add(fillet1_piece_7)
    with BuildSketch(Plane(origin=(17.761675913, 21.740833439, 26.385874891), x_dir=(-0.49999999999824063, -6.7137896292292946e-15, 0.8660254037854545), z_dir=(0, -1, 0))) as fillet1_piece_8a_section:
        with BuildLine():
            CenterArc((3.175, -3.108333376), FILLET1_R, 101.762045639, 78.237954362)
            Line((0, -3.108333376), (-0.0635, -3.108333376))
            Line((-0.0635, -3.108333376), (-0.0635, 0))
            Line((-0.0635, 0), (0, 0.0635))
            ThreePointArc((0, 0.0635), (1.263891971, 0.0635), (2.514839621, 0.062166668))
            Line((2.514839621, 0.062166668), (2.527783942, 0))
        make_face()
    fillet1_piece_8a = extrude(amount=17.295833439, mode=Mode.PRIVATE)
    fillet1_piece_8a = split(fillet1_piece_8a, bisect_by=Plane(origin=(18.074600574, 19.05, 27.295475154), z_dir=(0, -1, 0)), keep=Keep.TOP, mode=Mode.PRIVATE)
    fillet1_piece_8a = split(fillet1_piece_8a, bisect_by=Plane(origin=(18.074600574, 13.97, 27.295475154), z_dir=(0, 1, 0)), keep=Keep.TOP, mode=Mode.PRIVATE)
    with BuildSketch(Plane(origin=(25.699175913, 13.97, 12.637721606), x_dir=(0, 1, 0), z_dir=(-0.4999999999999996, 0, 0.8660254037844389))) as fillet1_piece_8b_section:
        with BuildLine():
            CenterArc((FILLET1_R, -FILLET1_R), FILLET1_R, 90, 90)
            Line((0, -FILLET1_R), (-FILLET1_R * 0.02, -FILLET1_R))
            Line((-FILLET1_R * 0.02, -FILLET1_R), (-FILLET1_R * 0.02, FILLET1_R * 0.02))
            Line((-FILLET1_R * 0.02, FILLET1_R * 0.02), (FILLET1_R, FILLET1_R * 0.02))
            Line((FILLET1_R, FILLET1_R * 0.02), (FILLET1_R, 0))
        make_face()
    fillet1_piece_8b = extrude(amount=23.8125, mode=Mode.PRIVATE)
    fillet1_piece_8b = split(fillet1_piece_8b, bisect_by=Plane(origin=(17.726628056, 14.764439111, 28.575), z_dir=(0, 0, -1)), keep=Keep.TOP, mode=Mode.PRIVATE)
    fillet1_piece_8b = split(fillet1_piece_8b, bisect_by=Plane(origin=(18.273302881, 14.764439111, 26.681262858), z_dir=(-0.49999999999999956, -6.713789629229294e-15, 0.8660254037844389)), keep=Keep.TOP, mode=Mode.PRIVATE)
    fillet1_piece_8 = fillet1_piece_8a & fillet1_piece_8b
    add(fillet1_piece_8)


solid = part.part
